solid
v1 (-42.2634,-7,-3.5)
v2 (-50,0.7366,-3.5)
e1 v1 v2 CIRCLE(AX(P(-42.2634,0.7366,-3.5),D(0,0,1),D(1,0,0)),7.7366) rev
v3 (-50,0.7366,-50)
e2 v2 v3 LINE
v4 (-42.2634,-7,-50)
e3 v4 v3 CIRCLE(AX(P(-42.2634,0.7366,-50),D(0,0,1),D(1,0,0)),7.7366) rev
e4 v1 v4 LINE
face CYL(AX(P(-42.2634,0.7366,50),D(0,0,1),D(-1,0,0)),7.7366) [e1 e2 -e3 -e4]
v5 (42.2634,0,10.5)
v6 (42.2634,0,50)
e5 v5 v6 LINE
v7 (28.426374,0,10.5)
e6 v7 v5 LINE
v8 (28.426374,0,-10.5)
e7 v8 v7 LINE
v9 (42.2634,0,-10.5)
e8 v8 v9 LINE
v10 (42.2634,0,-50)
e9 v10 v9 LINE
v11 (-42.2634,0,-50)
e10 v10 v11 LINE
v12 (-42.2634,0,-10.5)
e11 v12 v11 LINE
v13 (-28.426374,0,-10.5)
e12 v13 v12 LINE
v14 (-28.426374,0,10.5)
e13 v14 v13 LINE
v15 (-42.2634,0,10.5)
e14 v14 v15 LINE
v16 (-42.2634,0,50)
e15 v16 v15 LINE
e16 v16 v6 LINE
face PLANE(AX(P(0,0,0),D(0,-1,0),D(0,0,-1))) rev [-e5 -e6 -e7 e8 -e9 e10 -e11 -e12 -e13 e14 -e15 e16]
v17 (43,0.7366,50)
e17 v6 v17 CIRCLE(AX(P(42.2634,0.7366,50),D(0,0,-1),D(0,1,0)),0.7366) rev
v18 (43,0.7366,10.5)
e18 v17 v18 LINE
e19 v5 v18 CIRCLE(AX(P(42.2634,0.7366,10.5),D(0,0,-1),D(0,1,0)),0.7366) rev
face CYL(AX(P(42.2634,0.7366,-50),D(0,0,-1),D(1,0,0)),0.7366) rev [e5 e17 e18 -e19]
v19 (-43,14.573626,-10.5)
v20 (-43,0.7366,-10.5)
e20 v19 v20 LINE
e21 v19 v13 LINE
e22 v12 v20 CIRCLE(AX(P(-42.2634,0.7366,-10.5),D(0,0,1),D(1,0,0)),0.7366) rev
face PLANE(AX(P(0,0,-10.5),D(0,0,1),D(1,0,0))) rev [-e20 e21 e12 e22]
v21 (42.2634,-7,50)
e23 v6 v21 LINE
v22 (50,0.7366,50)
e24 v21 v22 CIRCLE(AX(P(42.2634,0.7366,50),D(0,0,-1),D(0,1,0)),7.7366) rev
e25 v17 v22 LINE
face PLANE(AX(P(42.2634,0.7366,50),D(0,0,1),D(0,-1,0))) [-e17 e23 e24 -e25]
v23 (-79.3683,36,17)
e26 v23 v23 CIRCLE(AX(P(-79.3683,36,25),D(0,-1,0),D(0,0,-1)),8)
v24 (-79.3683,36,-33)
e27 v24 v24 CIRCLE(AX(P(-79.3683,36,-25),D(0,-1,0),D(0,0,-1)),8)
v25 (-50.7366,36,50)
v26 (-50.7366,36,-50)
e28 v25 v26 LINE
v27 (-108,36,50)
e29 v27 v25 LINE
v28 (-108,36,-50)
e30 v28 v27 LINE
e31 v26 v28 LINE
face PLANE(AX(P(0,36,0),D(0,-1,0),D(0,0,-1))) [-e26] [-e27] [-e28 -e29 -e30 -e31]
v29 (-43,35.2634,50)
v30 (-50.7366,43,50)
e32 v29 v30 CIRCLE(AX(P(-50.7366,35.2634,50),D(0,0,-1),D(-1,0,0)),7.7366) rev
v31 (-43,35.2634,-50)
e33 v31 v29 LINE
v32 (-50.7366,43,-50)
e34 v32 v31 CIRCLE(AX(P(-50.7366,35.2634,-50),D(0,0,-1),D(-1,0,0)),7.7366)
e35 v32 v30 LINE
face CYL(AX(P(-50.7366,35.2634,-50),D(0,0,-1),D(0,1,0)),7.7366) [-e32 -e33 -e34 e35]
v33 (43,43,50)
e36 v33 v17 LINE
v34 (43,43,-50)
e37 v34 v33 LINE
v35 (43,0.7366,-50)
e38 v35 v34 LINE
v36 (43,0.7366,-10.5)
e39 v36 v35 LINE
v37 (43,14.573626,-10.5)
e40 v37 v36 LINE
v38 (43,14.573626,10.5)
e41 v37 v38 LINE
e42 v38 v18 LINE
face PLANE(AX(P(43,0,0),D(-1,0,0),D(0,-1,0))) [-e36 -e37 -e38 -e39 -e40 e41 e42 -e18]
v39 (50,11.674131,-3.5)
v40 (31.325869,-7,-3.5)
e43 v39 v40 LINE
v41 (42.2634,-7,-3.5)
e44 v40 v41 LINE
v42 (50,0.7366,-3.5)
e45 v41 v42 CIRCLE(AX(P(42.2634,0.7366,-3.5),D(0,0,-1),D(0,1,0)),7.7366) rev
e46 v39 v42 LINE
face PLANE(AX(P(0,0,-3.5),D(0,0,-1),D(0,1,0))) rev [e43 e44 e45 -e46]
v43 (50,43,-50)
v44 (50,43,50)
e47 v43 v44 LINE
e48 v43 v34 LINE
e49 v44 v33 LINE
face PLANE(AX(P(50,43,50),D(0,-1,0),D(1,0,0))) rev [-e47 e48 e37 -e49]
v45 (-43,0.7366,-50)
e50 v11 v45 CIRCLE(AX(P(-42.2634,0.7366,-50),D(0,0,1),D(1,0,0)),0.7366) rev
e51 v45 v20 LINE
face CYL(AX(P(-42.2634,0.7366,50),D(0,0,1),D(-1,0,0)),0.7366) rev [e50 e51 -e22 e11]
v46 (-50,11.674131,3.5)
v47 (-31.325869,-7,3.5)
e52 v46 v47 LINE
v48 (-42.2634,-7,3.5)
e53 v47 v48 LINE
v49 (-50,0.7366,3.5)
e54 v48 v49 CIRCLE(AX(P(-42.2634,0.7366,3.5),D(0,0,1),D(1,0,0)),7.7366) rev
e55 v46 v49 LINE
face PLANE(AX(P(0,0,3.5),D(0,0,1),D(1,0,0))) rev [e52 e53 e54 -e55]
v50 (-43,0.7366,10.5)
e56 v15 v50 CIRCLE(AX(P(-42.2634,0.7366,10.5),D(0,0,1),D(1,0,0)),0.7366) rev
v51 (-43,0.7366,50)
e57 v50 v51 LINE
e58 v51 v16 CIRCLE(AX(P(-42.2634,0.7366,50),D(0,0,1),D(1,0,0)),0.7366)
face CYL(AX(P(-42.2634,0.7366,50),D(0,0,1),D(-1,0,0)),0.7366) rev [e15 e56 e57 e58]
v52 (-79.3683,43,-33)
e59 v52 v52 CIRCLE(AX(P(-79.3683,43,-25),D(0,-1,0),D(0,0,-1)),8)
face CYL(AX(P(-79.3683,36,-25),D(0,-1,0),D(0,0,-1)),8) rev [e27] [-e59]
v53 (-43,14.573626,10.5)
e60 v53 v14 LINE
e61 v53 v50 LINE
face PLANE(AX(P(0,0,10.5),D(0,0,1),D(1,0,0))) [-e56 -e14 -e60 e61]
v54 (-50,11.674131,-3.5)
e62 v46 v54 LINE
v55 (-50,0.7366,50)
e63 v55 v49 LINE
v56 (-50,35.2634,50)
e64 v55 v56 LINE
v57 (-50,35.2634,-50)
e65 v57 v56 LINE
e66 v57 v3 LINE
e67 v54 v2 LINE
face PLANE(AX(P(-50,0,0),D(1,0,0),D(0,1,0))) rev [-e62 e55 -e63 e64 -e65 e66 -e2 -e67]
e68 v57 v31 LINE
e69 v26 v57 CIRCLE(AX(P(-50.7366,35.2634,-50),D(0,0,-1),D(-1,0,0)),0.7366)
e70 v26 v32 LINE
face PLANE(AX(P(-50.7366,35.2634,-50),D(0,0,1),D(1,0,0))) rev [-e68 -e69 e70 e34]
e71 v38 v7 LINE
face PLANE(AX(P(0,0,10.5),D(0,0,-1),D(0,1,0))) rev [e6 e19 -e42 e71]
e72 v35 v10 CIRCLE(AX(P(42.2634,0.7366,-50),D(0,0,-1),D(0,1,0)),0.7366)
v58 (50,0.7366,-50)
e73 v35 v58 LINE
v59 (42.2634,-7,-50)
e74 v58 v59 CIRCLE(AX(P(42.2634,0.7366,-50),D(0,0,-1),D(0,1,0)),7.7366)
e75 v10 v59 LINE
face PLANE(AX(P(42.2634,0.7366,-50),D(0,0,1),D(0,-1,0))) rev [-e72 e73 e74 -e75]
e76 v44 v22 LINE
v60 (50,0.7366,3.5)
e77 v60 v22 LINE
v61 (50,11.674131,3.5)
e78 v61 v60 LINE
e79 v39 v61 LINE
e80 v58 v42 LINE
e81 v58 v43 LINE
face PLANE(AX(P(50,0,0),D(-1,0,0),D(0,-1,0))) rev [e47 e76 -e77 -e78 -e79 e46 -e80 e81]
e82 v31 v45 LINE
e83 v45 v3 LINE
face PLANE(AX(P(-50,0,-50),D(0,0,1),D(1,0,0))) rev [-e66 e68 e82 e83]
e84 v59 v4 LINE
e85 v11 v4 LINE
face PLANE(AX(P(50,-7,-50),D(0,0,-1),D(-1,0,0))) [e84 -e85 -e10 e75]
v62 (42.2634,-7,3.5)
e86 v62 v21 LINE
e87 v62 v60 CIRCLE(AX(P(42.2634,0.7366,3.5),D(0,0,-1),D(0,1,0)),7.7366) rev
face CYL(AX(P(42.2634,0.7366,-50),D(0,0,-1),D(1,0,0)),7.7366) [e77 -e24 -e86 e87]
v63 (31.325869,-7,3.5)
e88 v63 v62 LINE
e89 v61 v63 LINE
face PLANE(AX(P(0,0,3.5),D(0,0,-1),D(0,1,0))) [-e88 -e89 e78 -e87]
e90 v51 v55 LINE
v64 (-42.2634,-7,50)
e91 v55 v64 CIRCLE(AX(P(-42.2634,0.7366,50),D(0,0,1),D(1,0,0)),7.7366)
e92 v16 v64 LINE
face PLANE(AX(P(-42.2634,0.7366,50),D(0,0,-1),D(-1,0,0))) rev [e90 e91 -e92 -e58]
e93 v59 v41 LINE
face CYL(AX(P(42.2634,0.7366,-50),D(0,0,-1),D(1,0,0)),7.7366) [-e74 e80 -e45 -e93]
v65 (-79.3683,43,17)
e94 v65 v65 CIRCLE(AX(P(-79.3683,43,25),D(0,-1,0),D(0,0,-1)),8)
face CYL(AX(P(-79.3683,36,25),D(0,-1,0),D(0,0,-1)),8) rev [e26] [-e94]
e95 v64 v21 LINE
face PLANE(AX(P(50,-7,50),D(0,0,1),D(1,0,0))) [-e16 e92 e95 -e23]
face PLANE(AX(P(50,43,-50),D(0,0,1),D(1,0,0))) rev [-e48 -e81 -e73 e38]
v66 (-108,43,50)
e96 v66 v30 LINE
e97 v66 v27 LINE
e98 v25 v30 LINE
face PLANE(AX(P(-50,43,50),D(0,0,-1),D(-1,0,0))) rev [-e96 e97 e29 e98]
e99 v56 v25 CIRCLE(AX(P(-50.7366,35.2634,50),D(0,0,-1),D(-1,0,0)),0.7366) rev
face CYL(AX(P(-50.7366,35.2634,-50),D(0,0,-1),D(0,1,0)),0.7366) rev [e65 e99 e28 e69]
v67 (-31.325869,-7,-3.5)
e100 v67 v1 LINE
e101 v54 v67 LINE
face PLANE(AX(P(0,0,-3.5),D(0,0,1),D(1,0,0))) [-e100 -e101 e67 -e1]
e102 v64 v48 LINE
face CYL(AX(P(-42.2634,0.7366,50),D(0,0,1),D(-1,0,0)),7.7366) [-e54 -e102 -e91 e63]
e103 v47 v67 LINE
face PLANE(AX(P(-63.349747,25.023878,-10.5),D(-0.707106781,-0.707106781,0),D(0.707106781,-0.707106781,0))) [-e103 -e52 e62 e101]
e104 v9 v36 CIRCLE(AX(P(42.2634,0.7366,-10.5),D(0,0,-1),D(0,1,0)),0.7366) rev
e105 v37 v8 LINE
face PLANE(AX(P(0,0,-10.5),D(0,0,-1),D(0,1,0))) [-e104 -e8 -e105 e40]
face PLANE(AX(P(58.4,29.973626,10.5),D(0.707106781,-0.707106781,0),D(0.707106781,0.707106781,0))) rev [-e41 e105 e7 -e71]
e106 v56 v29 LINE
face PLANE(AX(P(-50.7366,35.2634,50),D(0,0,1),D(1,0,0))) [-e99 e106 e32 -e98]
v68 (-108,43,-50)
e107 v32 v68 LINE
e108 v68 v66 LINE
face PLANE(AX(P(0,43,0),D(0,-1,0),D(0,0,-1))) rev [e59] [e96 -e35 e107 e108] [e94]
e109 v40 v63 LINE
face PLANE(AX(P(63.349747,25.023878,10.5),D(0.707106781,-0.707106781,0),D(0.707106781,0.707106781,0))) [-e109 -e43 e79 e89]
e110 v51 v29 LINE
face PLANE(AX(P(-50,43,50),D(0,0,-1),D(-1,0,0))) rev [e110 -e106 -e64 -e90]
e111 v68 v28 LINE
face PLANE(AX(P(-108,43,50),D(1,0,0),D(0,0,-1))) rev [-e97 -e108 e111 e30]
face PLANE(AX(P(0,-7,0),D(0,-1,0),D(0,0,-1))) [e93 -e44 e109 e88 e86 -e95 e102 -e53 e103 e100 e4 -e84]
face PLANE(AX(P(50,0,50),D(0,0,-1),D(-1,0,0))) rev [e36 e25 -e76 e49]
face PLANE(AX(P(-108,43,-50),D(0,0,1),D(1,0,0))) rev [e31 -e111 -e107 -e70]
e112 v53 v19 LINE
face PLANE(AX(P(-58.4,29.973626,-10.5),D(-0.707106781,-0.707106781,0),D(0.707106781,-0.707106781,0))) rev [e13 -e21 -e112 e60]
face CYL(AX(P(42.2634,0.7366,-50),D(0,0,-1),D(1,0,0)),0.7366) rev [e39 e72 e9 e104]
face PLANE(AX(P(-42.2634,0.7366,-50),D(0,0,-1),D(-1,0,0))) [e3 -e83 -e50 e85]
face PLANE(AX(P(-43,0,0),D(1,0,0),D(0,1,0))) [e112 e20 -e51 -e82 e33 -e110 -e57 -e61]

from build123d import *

# Parameters (mm, degrees)
SKETCH1_W                      = 100
SKETCH1_H                      = 100
BASE_FLANGE1_DEPTH             = 7
EDGE_FLANGE1_STRIP_W           = 29.4732
EDGE_FLANGE1_STRIP_H           = 7
EDGE_FLANGE1_STRIP_CUT_DEPTH   = 100
EDGE_FLANGE1_STRIP_2_W         = 29.4732
EDGE_FLANGE1_STRIP_2_H         = 7
EDGE_FLANGE1_STRIP_CUT_2_DEPTH = 100
EDGE_FLANGE1_DEPTH             = 100
EDGE_FLANGE1_BEND_DEPTH        = 100
SHEET_START                    = -3.5
SHEET_METAL_GUSSET13_DEPTH     = 7
SHEET_START_2                  = -10.5
SHEET_METAL_GUSSET13_2_DEPTH   = 21
SHEET_METAL_GUSSET13_3_DEPTH   = 7
SHEET_START_3                  = 3.5
SHEET_METAL_GUSSET13_4_DEPTH   = 7
SHEET_METAL_GUSSET14_DEPTH     = 7
SHEET_METAL_GUSSET14_2_DEPTH   = 21
SHEET_METAL_GUSSET14_3_DEPTH   = 7
SHEET_METAL_GUSSET14_4_DEPTH   = 7
EDGE_FLANGE3_STRIP_W           = 29.4732
EDGE_FLANGE3_STRIP_H           = 7
EDGE_FLANGE3_STRIP_CUT_DEPTH   = 100
EDGE_FLANGE3_DEPTH             = 100
F_16_0MM_DOWEL_HOLE1_D         = 16


# Read off the part's stored shape, not the designer's step: Sheet Metal Gusset13, Sheet Metal Gusset14
# Sheet-metal steps are written as plain solids
with BuildPart() as part:
    # Sketch1 → Base-Flange1 (new body)
    with BuildSketch(Plane(origin=(0, 0, 0), x_dir=(1, 0, 0), z_dir=(0, 1, 0))):
        Rectangle(SKETCH1_W, SKETCH1_H)
    extrude(amount=-BASE_FLANGE1_DEPTH)

    # Edge-Flange1 strip (across the edge) → Edge-Flange1 strip cut (cut)
    with BuildSketch(Plane(origin=(-50, 0, -50), x_dir=(1, 0, 0), z_dir=(0, 0, 1))):
        with Locations((-7, -3.5)):
            Rectangle(EDGE_FLANGE1_STRIP_W, EDGE_FLANGE1_STRIP_H)
    extrude(amount=EDGE_FLANGE1_STRIP_CUT_DEPTH, mode=Mode.SUBTRACT)

    # Edge-Flange1 strip 2 (across the edge) → Edge-Flange1 strip cut 2 (cut)
    with BuildSketch(Plane(origin=(50, 0, 50), x_dir=(-1, 0, 0), z_dir=(0, 0, -1))):
        with Locations((-7, -3.5)):
            Rectangle(EDGE_FLANGE1_STRIP_2_W, EDGE_FLANGE1_STRIP_2_H)
    extrude(amount=EDGE_FLANGE1_STRIP_CUT_2_DEPTH, mode=Mode.SUBTRACT)

    # Edge-Flange1 section (across the edge) → Edge-Flange1 (add)
    with BuildSketch(Plane(origin=(-50, 0, -50), x_dir=(1, 0, 0), z_dir=(0, 0, 1))):
        with BuildLine():
            Line((0, 0.7366), (0, 43))
            Line((0, 43), (7, 43))
            Line((7, 43), (7, 0.7366))
            ThreePointArc((7, 0.7366), (7.215745145, 0.215745145), (7.7366, 0))
            Line((7.7366, 0), (7.7366, -7))
            ThreePointArc((7.7366, -7), (2.265997677, -4.734002323), (0, 0.7366))
        make_face()
    extrude(amount=EDGE_FLANGE1_DEPTH)

    # Edge-Flange1 section 2 (across the edge) → Edge-Flange1 bend (add)
    with BuildSketch(Plane(origin=(50, 0, 50), x_dir=(-1, 0, 0), z_dir=(0, 0, -1))):
        with BuildLine():
            Line((0, 0.7366), (0, 43))
            Line((0, 43), (7, 43))
            Line((7, 43), (7, 0.7366))
            ThreePointArc((7, 0.7366), (7.215745145, 0.215745145), (7.7366, 0))
            Line((7.7366, 0), (7.7366, -7))
            ThreePointArc((7.7366, -7), (2.265997677, -4.734002323), (0, 0.7366))
        make_face()
    extrude(amount=EDGE_FLANGE1_BEND_DEPTH)

    # Sheet Metal Gusset13 outline → Sheet Metal Gusset13 (cut)
    with BuildSketch(Plane.XY.offset(SHEET_START)):
        with BuildLine():
            Line((42.2634, 0), (38.325869023, 0))
            Line((38.325869023, 0), (31.325869023, -7))
            Line((31.325869023, -7), (42.2634, -7))
            ThreePointArc((42.2634, -7), (47.734002323, -4.734002323), (50, 0.7366))
            Line((50, 0.7366), (50, 11.674130977))
            Line((50, 11.674130977), (43, 4.674130977))
            Line((43, 4.674130977), (43, 0.7366))
            ThreePointArc((43, 0.7366), (42.784254855, 0.215745145), (42.2634, 0))
        make_face()
    extrude(amount=SHEET_METAL_GUSSET13_DEPTH, mode=Mode.SUBTRACT)

    # Sheet Metal Gusset13 2 outline → Sheet Metal Gusset13 2 (add)
    with BuildSketch(Plane.XY.offset(SHEET_START_2)):
        Polygon((43, 14.573625914), (28.426374086, 0), (38.325869023, 0), (43, 4.674130977), align=None)
    extrude(amount=SHEET_METAL_GUSSET13_2_DEPTH)

    # Sheet Metal Gusset13 3 outline → Sheet Metal Gusset13 3 (add)
    with BuildSketch(Plane.XY.offset(SHEET_START_2)):
        with BuildLine():
            Line((43, 4.674130977), (38.325869023, 0))
            Line((38.325869023, 0), (42.2634, 0))
            ThreePointArc((42.2634, 0), (42.784254855, 0.215745145), (43, 0.7366))
            Line((43, 0.7366), (43, 4.674130977))
        make_face()
    extrude(amount=SHEET_METAL_GUSSET13_3_DEPTH)

    # Sheet Metal Gusset13 4 outline → Sheet Metal Gusset13 4 (add)
    with BuildSketch(Plane.XY.offset(SHEET_START_3)):
        with BuildLine():
            Line((43, 4.674130977), (38.325869023, 0))
            Line((38.325869023, 0), (42.2634, 0))
            ThreePointArc((42.2634, 0), (42.784254855, 0.215745145), (43, 0.7366))
            Line((43, 0.7366), (43, 4.674130977))
        make_face()
    extrude(amount=SHEET_METAL_GUSSET13_4_DEPTH)

    # Sheet Metal Gusset14 outline → Sheet Metal Gusset14 (cut)
    with BuildSketch(Plane.XY.offset(SHEET_START)):
        with BuildLine():
            Line((-43, 0.7366), (-43, 4.674130977))
            Line((-43, 4.674130977), (-50, 11.674130977))
            Line((-50, 11.674130977), (-50, 0.7366))
            ThreePointArc((-50, 0.7366), (-47.734002323, -4.734002323), (-42.2634, -7))
            Line((-42.2634, -7), (-31.325869023, -7))
            Line((-31.325869023, -7), (-38.325869023, 0))
            Line((-38.325869023, 0), (-42.2634, 0))
            ThreePointArc((-42.2634, 0), (-42.784254855, 0.215745145), (-43, 0.7366))
        make_face()
    extrude(amount=SHEET_METAL_GUSSET14_DEPTH, mode=Mode.SUBTRACT)

    # Sheet Metal Gusset14 2 outline → Sheet Metal Gusset14 2 (add)
    with BuildSketch(Plane.XY.offset(SHEET_START_2)):
        Polygon((-28.426374086, 0), (-43, 14.573625914), (-43, 4.674130977), (-38.325869023, 0), align=None)
    extrude(amount=SHEET_METAL_GUSSET14_2_DEPTH)

    # Sheet Metal Gusset14 3 outline → Sheet Metal Gusset14 3 (add)
    with BuildSketch(Plane.XY.offset(SHEET_START_2)):
        with BuildLine():
            Line((-38.325869023, 0), (-43, 4.674130977))
            Line((-43, 4.674130977), (-43, 0.7366))
            ThreePointArc((-43, 0.7366), (-42.784254855, 0.215745145), (-42.2634, 0))
            Line((-42.2634, 0), (-38.325869023, 0))
        make_face()
    extrude(amount=SHEET_METAL_GUSSET14_3_DEPTH)

    # Sheet Metal Gusset14 4 outline → Sheet Metal Gusset14 4 (add)
    with BuildSketch(Plane.XY.offset(SHEET_START_3)):
        with BuildLine():
            Line((-38.325869023, 0), (-43, 4.674130977))
            Line((-43, 4.674130977), (-43, 0.7366))
            ThreePointArc((-43, 0.7366), (-42.784254855, 0.215745145), (-42.2634, 0))
            Line((-42.2634, 0), (-38.325869023, 0))
        make_face()
    extrude(amount=SHEET_METAL_GUSSET14_4_DEPTH)

    # Edge-Flange3 strip (across the edge) → Edge-Flange3 strip cut (cut)
    with BuildSketch(Plane(origin=(-50, 43, 50), x_dir=(0, -1, 0), z_dir=(0, 0, -1))):
        with Locations((-7, -3.5)):
            Rectangle(EDGE_FLANGE3_STRIP_W, EDGE_FLANGE3_STRIP_H)
    extrude(amount=EDGE_FLANGE3_STRIP_CUT_DEPTH, mode=Mode.SUBTRACT)

    # Edge-Flange3 section (across the edge) → Edge-Flange3 (add)
    with BuildSketch(Plane(origin=(-50, 43, 50), x_dir=(0, -1, 0), z_dir=(0, 0, -1))):
        with BuildLine():
            Line((0, 0.7366), (0, 58))
            Line((0, 58), (7, 58))
            Line((7, 58), (7, 0.7366))
            ThreePointArc((7, 0.7366), (7.215745145, 0.215745145), (7.7366, 0))
            Line((7.7366, 0), (7.7366, -7))
            ThreePointArc((7.7366, -7), (2.265997677, -4.734002323), (0, 0.7366))
        make_face()
    extrude(amount=EDGE_FLANGE3_DEPTH)

    # Ø16.0mm Dowel Hole1 (through all)
    with Locations(Plane(origin=(0, 36, 0), x_dir=(-1, 0, 0), z_dir=(0, -1, 0))):
        with Locations((79.3683, -25), (79.3683, 25)):
            Hole(F_16_0MM_DOWEL_HOLE1_D / 2)


solid = part.part
